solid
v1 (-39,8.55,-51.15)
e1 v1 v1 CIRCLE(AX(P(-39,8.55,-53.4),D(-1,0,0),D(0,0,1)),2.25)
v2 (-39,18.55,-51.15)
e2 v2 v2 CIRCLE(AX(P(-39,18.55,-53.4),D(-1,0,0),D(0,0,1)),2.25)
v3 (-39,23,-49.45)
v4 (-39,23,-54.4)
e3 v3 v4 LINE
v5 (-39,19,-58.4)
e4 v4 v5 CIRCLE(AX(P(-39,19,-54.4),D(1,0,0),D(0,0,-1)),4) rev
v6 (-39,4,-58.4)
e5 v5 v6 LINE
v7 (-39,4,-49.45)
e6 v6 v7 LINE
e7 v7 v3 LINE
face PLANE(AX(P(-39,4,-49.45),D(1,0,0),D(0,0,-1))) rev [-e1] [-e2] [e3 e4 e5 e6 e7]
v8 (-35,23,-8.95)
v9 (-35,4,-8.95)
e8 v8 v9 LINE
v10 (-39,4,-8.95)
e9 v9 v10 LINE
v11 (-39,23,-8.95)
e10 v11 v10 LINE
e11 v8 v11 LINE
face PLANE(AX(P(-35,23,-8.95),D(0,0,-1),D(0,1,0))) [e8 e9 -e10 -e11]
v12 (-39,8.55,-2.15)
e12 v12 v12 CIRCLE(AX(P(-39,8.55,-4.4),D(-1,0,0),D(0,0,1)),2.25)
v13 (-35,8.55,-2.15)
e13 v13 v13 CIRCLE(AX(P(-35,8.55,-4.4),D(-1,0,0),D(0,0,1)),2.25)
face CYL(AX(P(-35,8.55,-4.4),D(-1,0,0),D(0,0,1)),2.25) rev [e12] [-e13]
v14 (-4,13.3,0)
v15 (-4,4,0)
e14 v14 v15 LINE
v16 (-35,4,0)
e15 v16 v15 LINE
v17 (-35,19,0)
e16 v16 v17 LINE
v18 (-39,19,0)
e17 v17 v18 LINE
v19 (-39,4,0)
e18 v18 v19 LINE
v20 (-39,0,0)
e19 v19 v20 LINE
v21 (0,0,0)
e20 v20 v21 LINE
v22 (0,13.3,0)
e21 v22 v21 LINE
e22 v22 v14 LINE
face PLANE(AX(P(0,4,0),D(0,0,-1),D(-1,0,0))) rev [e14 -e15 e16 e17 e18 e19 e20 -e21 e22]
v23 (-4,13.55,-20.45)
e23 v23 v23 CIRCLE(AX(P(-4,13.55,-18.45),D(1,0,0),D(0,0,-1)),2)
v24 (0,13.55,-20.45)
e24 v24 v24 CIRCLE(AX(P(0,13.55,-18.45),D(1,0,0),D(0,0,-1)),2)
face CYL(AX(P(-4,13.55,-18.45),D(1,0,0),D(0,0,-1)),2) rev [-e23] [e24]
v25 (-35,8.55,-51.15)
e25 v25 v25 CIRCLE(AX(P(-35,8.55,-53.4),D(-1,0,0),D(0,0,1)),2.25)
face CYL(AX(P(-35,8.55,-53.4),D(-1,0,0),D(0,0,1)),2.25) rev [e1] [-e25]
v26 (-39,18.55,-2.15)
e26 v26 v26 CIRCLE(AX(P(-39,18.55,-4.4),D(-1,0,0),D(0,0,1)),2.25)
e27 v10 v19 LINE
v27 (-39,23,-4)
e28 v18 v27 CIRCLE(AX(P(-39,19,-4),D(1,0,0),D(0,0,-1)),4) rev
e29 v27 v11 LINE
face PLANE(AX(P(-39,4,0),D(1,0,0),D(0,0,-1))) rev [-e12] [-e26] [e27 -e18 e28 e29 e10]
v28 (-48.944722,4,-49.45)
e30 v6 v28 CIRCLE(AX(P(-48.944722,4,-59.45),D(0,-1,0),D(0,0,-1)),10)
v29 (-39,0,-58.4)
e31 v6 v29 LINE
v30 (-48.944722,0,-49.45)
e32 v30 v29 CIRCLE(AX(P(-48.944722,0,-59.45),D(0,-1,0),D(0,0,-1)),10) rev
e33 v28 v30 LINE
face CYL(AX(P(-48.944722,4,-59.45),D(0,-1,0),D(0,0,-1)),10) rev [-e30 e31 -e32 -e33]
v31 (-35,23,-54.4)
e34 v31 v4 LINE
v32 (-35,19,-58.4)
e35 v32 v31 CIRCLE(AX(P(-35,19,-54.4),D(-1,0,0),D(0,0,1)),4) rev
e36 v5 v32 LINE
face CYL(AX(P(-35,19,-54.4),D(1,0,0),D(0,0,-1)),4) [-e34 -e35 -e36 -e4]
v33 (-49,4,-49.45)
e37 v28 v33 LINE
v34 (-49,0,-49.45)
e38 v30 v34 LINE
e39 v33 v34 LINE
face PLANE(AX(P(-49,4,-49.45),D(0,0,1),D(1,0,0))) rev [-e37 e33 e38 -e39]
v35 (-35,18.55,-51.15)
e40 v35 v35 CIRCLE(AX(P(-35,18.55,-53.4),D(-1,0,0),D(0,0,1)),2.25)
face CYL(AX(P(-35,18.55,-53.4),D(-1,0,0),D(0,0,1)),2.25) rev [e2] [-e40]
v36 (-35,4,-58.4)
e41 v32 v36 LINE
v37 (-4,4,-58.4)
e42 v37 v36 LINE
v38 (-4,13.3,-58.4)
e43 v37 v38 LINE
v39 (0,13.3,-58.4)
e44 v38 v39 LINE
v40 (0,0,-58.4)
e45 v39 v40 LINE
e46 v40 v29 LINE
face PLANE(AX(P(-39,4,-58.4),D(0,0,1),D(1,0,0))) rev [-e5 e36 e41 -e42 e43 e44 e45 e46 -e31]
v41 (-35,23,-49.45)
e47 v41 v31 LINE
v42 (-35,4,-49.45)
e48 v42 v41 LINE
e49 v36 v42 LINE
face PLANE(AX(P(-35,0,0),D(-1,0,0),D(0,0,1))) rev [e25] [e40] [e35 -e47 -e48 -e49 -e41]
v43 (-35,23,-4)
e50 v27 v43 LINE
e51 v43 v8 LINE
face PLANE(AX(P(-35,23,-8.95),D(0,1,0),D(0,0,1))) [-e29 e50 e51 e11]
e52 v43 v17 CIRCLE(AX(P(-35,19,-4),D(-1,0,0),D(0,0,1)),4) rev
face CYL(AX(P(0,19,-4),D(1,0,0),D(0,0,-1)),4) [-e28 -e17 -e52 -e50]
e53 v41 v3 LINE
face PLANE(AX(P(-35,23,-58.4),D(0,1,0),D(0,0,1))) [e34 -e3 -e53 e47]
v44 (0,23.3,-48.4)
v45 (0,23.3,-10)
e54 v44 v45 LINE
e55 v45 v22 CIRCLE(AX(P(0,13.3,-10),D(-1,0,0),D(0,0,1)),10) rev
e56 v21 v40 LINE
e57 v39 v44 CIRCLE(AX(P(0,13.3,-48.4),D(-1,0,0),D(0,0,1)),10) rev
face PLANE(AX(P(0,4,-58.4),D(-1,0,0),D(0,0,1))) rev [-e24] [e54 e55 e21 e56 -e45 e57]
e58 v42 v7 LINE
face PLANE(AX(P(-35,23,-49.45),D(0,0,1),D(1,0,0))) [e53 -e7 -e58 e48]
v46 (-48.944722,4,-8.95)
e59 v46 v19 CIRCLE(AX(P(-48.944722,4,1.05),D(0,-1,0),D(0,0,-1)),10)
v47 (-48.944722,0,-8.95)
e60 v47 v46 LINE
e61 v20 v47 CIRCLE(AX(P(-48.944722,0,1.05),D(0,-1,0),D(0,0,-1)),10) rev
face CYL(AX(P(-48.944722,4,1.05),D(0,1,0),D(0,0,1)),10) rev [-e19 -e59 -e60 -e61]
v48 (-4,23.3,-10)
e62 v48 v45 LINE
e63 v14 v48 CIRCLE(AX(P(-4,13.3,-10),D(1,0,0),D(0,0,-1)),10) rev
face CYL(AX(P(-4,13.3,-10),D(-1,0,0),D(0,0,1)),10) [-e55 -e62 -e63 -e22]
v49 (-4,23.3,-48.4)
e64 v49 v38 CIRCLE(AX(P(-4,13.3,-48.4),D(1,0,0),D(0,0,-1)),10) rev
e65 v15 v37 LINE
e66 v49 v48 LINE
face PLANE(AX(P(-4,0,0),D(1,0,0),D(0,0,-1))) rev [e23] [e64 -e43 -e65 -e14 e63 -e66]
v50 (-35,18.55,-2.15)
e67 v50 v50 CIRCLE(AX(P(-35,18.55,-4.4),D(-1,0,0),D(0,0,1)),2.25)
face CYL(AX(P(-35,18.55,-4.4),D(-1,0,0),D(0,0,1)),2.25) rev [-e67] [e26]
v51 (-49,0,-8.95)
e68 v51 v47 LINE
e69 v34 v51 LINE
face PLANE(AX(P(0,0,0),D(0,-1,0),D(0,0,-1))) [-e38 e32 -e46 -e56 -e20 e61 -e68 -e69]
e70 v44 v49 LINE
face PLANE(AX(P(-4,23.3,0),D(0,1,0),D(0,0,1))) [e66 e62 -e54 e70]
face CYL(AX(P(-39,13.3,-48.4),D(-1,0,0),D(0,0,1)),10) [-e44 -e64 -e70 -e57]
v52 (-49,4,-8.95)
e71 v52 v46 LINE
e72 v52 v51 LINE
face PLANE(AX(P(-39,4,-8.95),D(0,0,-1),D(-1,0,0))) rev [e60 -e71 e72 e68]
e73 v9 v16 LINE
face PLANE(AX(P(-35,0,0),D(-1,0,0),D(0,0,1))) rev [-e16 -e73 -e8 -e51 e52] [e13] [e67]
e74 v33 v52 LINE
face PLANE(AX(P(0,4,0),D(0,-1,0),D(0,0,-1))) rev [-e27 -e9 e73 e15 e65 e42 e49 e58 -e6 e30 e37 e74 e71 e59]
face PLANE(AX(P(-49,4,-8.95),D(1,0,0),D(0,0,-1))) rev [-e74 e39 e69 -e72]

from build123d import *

# Parameters (mm, degrees)
BOSS_EXTRUDE1_DEPTH = 4
SKETCH2_W           = 8.95
SKETCH2_H           = 19
SKETCH2_R           = 2.25
BOSS_EXTRUDE2_DEPTH = 4
FILLET1_R           = 10
FILLET2_R           = 4
SKETCH3_W           = 58.4
SKETCH3_H           = 19.3
SKETCH3_R           = 2
BOSS_EXTRUDE3_DEPTH = 4
FILLET3_R           = 10


with BuildPart() as part:
    # Sketch1 → Boss-Extrude1 (new body)
    with BuildSketch(Plane(origin=(0, 0, 0), x_dir=(1, 0, 0), z_dir=(0, 1, 0))):
        Polygon((-49, 49.45), (-39, 49.45), (-39, 58.4), (0, 58.4), (0, 0), (-39, 0), (-39, 8.95), (-49, 8.95), align=None)
    extrude(amount=BOSS_EXTRUDE1_DEPTH)

    # Sketch2 → Boss-Extrude2 (add)
    # profile 1 of 2: a face of its own
    with BuildSketch(Plane.ZY.offset(39)):
        with Locations((-4.475, 13.5)):
            Rectangle(SKETCH2_W, SKETCH2_H)
        with Locations((-4.4, 18.55)):
            Circle(SKETCH2_R, mode=Mode.SUBTRACT)
        with Locations((-4.4, 8.55)):
            Circle(SKETCH2_R, mode=Mode.SUBTRACT)
    # profile 2 of 2: a face of its own
    with BuildSketch(Plane.ZY.offset(39)):
        with Locations((-53.925, 13.5)):
            Rectangle(SKETCH2_W, SKETCH2_H)
        with Locations((-53.4, 18.55)):
            Circle(SKETCH2_R, mode=Mode.SUBTRACT)
        with Locations((-53.4, 8.55)):
            Circle(SKETCH2_R, mode=Mode.SUBTRACT)
    extrude(amount=-BOSS_EXTRUDE2_DEPTH)

    # Fillet1
    # the kernel refuses this fillet: 10 mm, written as the material it adds along each edge
    with BuildSketch(Plane(origin=(-39, 0, -49.45), x_dir=(-1, 0, 0), z_dir=(0, 1, 0))) as fillet1_piece_1:
        with BuildLine():
            CenterArc((9.944722218, -10), FILLET1_R, 90, 83.97283344)
            Line((0, -8.95), (0, 0))
            Line((0, 0), (9.944722218, 0))
        make_face()
    extrude(amount=4)
    with BuildSketch(Plane(origin=(-39, 0, -8.95), x_dir=(0, 0, 1), z_dir=(0, 1, 0))) as fillet1_piece_2:
        with BuildLine():
            CenterArc((10, -9.944722218), FILLET1_R, 96.02716656, 83.97283344)
            Line((0, -9.944722218), (0, 0))
            Line((0, 0), (8.95, 0))
        make_face()
    extrude(amount=4)

    # Fillet2
    fillet2_edges = [part.edges().sort_by_distance(p)[0] for p in [
        (-37, 23, 0),
        (-37, 23, -58.4),
    ]]
    fillet(fillet2_edges, radius=FILLET2_R)

    # Sketch3 → Boss-Extrude3 (add)
    with BuildSketch(Plane(origin=(0, 0, 0), x_dir=(0, 0, -1), z_dir=(1, 0, 0))):
        with Locations((29.2, 13.65)):
            Rectangle(SKETCH3_W, SKETCH3_H)
        with Locations((18.45, 13.55)):
            Circle(SKETCH3_R, mode=Mode.SUBTRACT)
    extrude(amount=-BOSS_EXTRUDE3_DEPTH)

    # Fillet3
    fillet3_edges = [part.edges().sort_by_distance(p)[0] for p in [
        (-2, 23.3, 0),
        (-2, 23.3, -58.4),
    ]]
    fillet(fillet3_edges, radius=FILLET3_R)


solid = part.part
